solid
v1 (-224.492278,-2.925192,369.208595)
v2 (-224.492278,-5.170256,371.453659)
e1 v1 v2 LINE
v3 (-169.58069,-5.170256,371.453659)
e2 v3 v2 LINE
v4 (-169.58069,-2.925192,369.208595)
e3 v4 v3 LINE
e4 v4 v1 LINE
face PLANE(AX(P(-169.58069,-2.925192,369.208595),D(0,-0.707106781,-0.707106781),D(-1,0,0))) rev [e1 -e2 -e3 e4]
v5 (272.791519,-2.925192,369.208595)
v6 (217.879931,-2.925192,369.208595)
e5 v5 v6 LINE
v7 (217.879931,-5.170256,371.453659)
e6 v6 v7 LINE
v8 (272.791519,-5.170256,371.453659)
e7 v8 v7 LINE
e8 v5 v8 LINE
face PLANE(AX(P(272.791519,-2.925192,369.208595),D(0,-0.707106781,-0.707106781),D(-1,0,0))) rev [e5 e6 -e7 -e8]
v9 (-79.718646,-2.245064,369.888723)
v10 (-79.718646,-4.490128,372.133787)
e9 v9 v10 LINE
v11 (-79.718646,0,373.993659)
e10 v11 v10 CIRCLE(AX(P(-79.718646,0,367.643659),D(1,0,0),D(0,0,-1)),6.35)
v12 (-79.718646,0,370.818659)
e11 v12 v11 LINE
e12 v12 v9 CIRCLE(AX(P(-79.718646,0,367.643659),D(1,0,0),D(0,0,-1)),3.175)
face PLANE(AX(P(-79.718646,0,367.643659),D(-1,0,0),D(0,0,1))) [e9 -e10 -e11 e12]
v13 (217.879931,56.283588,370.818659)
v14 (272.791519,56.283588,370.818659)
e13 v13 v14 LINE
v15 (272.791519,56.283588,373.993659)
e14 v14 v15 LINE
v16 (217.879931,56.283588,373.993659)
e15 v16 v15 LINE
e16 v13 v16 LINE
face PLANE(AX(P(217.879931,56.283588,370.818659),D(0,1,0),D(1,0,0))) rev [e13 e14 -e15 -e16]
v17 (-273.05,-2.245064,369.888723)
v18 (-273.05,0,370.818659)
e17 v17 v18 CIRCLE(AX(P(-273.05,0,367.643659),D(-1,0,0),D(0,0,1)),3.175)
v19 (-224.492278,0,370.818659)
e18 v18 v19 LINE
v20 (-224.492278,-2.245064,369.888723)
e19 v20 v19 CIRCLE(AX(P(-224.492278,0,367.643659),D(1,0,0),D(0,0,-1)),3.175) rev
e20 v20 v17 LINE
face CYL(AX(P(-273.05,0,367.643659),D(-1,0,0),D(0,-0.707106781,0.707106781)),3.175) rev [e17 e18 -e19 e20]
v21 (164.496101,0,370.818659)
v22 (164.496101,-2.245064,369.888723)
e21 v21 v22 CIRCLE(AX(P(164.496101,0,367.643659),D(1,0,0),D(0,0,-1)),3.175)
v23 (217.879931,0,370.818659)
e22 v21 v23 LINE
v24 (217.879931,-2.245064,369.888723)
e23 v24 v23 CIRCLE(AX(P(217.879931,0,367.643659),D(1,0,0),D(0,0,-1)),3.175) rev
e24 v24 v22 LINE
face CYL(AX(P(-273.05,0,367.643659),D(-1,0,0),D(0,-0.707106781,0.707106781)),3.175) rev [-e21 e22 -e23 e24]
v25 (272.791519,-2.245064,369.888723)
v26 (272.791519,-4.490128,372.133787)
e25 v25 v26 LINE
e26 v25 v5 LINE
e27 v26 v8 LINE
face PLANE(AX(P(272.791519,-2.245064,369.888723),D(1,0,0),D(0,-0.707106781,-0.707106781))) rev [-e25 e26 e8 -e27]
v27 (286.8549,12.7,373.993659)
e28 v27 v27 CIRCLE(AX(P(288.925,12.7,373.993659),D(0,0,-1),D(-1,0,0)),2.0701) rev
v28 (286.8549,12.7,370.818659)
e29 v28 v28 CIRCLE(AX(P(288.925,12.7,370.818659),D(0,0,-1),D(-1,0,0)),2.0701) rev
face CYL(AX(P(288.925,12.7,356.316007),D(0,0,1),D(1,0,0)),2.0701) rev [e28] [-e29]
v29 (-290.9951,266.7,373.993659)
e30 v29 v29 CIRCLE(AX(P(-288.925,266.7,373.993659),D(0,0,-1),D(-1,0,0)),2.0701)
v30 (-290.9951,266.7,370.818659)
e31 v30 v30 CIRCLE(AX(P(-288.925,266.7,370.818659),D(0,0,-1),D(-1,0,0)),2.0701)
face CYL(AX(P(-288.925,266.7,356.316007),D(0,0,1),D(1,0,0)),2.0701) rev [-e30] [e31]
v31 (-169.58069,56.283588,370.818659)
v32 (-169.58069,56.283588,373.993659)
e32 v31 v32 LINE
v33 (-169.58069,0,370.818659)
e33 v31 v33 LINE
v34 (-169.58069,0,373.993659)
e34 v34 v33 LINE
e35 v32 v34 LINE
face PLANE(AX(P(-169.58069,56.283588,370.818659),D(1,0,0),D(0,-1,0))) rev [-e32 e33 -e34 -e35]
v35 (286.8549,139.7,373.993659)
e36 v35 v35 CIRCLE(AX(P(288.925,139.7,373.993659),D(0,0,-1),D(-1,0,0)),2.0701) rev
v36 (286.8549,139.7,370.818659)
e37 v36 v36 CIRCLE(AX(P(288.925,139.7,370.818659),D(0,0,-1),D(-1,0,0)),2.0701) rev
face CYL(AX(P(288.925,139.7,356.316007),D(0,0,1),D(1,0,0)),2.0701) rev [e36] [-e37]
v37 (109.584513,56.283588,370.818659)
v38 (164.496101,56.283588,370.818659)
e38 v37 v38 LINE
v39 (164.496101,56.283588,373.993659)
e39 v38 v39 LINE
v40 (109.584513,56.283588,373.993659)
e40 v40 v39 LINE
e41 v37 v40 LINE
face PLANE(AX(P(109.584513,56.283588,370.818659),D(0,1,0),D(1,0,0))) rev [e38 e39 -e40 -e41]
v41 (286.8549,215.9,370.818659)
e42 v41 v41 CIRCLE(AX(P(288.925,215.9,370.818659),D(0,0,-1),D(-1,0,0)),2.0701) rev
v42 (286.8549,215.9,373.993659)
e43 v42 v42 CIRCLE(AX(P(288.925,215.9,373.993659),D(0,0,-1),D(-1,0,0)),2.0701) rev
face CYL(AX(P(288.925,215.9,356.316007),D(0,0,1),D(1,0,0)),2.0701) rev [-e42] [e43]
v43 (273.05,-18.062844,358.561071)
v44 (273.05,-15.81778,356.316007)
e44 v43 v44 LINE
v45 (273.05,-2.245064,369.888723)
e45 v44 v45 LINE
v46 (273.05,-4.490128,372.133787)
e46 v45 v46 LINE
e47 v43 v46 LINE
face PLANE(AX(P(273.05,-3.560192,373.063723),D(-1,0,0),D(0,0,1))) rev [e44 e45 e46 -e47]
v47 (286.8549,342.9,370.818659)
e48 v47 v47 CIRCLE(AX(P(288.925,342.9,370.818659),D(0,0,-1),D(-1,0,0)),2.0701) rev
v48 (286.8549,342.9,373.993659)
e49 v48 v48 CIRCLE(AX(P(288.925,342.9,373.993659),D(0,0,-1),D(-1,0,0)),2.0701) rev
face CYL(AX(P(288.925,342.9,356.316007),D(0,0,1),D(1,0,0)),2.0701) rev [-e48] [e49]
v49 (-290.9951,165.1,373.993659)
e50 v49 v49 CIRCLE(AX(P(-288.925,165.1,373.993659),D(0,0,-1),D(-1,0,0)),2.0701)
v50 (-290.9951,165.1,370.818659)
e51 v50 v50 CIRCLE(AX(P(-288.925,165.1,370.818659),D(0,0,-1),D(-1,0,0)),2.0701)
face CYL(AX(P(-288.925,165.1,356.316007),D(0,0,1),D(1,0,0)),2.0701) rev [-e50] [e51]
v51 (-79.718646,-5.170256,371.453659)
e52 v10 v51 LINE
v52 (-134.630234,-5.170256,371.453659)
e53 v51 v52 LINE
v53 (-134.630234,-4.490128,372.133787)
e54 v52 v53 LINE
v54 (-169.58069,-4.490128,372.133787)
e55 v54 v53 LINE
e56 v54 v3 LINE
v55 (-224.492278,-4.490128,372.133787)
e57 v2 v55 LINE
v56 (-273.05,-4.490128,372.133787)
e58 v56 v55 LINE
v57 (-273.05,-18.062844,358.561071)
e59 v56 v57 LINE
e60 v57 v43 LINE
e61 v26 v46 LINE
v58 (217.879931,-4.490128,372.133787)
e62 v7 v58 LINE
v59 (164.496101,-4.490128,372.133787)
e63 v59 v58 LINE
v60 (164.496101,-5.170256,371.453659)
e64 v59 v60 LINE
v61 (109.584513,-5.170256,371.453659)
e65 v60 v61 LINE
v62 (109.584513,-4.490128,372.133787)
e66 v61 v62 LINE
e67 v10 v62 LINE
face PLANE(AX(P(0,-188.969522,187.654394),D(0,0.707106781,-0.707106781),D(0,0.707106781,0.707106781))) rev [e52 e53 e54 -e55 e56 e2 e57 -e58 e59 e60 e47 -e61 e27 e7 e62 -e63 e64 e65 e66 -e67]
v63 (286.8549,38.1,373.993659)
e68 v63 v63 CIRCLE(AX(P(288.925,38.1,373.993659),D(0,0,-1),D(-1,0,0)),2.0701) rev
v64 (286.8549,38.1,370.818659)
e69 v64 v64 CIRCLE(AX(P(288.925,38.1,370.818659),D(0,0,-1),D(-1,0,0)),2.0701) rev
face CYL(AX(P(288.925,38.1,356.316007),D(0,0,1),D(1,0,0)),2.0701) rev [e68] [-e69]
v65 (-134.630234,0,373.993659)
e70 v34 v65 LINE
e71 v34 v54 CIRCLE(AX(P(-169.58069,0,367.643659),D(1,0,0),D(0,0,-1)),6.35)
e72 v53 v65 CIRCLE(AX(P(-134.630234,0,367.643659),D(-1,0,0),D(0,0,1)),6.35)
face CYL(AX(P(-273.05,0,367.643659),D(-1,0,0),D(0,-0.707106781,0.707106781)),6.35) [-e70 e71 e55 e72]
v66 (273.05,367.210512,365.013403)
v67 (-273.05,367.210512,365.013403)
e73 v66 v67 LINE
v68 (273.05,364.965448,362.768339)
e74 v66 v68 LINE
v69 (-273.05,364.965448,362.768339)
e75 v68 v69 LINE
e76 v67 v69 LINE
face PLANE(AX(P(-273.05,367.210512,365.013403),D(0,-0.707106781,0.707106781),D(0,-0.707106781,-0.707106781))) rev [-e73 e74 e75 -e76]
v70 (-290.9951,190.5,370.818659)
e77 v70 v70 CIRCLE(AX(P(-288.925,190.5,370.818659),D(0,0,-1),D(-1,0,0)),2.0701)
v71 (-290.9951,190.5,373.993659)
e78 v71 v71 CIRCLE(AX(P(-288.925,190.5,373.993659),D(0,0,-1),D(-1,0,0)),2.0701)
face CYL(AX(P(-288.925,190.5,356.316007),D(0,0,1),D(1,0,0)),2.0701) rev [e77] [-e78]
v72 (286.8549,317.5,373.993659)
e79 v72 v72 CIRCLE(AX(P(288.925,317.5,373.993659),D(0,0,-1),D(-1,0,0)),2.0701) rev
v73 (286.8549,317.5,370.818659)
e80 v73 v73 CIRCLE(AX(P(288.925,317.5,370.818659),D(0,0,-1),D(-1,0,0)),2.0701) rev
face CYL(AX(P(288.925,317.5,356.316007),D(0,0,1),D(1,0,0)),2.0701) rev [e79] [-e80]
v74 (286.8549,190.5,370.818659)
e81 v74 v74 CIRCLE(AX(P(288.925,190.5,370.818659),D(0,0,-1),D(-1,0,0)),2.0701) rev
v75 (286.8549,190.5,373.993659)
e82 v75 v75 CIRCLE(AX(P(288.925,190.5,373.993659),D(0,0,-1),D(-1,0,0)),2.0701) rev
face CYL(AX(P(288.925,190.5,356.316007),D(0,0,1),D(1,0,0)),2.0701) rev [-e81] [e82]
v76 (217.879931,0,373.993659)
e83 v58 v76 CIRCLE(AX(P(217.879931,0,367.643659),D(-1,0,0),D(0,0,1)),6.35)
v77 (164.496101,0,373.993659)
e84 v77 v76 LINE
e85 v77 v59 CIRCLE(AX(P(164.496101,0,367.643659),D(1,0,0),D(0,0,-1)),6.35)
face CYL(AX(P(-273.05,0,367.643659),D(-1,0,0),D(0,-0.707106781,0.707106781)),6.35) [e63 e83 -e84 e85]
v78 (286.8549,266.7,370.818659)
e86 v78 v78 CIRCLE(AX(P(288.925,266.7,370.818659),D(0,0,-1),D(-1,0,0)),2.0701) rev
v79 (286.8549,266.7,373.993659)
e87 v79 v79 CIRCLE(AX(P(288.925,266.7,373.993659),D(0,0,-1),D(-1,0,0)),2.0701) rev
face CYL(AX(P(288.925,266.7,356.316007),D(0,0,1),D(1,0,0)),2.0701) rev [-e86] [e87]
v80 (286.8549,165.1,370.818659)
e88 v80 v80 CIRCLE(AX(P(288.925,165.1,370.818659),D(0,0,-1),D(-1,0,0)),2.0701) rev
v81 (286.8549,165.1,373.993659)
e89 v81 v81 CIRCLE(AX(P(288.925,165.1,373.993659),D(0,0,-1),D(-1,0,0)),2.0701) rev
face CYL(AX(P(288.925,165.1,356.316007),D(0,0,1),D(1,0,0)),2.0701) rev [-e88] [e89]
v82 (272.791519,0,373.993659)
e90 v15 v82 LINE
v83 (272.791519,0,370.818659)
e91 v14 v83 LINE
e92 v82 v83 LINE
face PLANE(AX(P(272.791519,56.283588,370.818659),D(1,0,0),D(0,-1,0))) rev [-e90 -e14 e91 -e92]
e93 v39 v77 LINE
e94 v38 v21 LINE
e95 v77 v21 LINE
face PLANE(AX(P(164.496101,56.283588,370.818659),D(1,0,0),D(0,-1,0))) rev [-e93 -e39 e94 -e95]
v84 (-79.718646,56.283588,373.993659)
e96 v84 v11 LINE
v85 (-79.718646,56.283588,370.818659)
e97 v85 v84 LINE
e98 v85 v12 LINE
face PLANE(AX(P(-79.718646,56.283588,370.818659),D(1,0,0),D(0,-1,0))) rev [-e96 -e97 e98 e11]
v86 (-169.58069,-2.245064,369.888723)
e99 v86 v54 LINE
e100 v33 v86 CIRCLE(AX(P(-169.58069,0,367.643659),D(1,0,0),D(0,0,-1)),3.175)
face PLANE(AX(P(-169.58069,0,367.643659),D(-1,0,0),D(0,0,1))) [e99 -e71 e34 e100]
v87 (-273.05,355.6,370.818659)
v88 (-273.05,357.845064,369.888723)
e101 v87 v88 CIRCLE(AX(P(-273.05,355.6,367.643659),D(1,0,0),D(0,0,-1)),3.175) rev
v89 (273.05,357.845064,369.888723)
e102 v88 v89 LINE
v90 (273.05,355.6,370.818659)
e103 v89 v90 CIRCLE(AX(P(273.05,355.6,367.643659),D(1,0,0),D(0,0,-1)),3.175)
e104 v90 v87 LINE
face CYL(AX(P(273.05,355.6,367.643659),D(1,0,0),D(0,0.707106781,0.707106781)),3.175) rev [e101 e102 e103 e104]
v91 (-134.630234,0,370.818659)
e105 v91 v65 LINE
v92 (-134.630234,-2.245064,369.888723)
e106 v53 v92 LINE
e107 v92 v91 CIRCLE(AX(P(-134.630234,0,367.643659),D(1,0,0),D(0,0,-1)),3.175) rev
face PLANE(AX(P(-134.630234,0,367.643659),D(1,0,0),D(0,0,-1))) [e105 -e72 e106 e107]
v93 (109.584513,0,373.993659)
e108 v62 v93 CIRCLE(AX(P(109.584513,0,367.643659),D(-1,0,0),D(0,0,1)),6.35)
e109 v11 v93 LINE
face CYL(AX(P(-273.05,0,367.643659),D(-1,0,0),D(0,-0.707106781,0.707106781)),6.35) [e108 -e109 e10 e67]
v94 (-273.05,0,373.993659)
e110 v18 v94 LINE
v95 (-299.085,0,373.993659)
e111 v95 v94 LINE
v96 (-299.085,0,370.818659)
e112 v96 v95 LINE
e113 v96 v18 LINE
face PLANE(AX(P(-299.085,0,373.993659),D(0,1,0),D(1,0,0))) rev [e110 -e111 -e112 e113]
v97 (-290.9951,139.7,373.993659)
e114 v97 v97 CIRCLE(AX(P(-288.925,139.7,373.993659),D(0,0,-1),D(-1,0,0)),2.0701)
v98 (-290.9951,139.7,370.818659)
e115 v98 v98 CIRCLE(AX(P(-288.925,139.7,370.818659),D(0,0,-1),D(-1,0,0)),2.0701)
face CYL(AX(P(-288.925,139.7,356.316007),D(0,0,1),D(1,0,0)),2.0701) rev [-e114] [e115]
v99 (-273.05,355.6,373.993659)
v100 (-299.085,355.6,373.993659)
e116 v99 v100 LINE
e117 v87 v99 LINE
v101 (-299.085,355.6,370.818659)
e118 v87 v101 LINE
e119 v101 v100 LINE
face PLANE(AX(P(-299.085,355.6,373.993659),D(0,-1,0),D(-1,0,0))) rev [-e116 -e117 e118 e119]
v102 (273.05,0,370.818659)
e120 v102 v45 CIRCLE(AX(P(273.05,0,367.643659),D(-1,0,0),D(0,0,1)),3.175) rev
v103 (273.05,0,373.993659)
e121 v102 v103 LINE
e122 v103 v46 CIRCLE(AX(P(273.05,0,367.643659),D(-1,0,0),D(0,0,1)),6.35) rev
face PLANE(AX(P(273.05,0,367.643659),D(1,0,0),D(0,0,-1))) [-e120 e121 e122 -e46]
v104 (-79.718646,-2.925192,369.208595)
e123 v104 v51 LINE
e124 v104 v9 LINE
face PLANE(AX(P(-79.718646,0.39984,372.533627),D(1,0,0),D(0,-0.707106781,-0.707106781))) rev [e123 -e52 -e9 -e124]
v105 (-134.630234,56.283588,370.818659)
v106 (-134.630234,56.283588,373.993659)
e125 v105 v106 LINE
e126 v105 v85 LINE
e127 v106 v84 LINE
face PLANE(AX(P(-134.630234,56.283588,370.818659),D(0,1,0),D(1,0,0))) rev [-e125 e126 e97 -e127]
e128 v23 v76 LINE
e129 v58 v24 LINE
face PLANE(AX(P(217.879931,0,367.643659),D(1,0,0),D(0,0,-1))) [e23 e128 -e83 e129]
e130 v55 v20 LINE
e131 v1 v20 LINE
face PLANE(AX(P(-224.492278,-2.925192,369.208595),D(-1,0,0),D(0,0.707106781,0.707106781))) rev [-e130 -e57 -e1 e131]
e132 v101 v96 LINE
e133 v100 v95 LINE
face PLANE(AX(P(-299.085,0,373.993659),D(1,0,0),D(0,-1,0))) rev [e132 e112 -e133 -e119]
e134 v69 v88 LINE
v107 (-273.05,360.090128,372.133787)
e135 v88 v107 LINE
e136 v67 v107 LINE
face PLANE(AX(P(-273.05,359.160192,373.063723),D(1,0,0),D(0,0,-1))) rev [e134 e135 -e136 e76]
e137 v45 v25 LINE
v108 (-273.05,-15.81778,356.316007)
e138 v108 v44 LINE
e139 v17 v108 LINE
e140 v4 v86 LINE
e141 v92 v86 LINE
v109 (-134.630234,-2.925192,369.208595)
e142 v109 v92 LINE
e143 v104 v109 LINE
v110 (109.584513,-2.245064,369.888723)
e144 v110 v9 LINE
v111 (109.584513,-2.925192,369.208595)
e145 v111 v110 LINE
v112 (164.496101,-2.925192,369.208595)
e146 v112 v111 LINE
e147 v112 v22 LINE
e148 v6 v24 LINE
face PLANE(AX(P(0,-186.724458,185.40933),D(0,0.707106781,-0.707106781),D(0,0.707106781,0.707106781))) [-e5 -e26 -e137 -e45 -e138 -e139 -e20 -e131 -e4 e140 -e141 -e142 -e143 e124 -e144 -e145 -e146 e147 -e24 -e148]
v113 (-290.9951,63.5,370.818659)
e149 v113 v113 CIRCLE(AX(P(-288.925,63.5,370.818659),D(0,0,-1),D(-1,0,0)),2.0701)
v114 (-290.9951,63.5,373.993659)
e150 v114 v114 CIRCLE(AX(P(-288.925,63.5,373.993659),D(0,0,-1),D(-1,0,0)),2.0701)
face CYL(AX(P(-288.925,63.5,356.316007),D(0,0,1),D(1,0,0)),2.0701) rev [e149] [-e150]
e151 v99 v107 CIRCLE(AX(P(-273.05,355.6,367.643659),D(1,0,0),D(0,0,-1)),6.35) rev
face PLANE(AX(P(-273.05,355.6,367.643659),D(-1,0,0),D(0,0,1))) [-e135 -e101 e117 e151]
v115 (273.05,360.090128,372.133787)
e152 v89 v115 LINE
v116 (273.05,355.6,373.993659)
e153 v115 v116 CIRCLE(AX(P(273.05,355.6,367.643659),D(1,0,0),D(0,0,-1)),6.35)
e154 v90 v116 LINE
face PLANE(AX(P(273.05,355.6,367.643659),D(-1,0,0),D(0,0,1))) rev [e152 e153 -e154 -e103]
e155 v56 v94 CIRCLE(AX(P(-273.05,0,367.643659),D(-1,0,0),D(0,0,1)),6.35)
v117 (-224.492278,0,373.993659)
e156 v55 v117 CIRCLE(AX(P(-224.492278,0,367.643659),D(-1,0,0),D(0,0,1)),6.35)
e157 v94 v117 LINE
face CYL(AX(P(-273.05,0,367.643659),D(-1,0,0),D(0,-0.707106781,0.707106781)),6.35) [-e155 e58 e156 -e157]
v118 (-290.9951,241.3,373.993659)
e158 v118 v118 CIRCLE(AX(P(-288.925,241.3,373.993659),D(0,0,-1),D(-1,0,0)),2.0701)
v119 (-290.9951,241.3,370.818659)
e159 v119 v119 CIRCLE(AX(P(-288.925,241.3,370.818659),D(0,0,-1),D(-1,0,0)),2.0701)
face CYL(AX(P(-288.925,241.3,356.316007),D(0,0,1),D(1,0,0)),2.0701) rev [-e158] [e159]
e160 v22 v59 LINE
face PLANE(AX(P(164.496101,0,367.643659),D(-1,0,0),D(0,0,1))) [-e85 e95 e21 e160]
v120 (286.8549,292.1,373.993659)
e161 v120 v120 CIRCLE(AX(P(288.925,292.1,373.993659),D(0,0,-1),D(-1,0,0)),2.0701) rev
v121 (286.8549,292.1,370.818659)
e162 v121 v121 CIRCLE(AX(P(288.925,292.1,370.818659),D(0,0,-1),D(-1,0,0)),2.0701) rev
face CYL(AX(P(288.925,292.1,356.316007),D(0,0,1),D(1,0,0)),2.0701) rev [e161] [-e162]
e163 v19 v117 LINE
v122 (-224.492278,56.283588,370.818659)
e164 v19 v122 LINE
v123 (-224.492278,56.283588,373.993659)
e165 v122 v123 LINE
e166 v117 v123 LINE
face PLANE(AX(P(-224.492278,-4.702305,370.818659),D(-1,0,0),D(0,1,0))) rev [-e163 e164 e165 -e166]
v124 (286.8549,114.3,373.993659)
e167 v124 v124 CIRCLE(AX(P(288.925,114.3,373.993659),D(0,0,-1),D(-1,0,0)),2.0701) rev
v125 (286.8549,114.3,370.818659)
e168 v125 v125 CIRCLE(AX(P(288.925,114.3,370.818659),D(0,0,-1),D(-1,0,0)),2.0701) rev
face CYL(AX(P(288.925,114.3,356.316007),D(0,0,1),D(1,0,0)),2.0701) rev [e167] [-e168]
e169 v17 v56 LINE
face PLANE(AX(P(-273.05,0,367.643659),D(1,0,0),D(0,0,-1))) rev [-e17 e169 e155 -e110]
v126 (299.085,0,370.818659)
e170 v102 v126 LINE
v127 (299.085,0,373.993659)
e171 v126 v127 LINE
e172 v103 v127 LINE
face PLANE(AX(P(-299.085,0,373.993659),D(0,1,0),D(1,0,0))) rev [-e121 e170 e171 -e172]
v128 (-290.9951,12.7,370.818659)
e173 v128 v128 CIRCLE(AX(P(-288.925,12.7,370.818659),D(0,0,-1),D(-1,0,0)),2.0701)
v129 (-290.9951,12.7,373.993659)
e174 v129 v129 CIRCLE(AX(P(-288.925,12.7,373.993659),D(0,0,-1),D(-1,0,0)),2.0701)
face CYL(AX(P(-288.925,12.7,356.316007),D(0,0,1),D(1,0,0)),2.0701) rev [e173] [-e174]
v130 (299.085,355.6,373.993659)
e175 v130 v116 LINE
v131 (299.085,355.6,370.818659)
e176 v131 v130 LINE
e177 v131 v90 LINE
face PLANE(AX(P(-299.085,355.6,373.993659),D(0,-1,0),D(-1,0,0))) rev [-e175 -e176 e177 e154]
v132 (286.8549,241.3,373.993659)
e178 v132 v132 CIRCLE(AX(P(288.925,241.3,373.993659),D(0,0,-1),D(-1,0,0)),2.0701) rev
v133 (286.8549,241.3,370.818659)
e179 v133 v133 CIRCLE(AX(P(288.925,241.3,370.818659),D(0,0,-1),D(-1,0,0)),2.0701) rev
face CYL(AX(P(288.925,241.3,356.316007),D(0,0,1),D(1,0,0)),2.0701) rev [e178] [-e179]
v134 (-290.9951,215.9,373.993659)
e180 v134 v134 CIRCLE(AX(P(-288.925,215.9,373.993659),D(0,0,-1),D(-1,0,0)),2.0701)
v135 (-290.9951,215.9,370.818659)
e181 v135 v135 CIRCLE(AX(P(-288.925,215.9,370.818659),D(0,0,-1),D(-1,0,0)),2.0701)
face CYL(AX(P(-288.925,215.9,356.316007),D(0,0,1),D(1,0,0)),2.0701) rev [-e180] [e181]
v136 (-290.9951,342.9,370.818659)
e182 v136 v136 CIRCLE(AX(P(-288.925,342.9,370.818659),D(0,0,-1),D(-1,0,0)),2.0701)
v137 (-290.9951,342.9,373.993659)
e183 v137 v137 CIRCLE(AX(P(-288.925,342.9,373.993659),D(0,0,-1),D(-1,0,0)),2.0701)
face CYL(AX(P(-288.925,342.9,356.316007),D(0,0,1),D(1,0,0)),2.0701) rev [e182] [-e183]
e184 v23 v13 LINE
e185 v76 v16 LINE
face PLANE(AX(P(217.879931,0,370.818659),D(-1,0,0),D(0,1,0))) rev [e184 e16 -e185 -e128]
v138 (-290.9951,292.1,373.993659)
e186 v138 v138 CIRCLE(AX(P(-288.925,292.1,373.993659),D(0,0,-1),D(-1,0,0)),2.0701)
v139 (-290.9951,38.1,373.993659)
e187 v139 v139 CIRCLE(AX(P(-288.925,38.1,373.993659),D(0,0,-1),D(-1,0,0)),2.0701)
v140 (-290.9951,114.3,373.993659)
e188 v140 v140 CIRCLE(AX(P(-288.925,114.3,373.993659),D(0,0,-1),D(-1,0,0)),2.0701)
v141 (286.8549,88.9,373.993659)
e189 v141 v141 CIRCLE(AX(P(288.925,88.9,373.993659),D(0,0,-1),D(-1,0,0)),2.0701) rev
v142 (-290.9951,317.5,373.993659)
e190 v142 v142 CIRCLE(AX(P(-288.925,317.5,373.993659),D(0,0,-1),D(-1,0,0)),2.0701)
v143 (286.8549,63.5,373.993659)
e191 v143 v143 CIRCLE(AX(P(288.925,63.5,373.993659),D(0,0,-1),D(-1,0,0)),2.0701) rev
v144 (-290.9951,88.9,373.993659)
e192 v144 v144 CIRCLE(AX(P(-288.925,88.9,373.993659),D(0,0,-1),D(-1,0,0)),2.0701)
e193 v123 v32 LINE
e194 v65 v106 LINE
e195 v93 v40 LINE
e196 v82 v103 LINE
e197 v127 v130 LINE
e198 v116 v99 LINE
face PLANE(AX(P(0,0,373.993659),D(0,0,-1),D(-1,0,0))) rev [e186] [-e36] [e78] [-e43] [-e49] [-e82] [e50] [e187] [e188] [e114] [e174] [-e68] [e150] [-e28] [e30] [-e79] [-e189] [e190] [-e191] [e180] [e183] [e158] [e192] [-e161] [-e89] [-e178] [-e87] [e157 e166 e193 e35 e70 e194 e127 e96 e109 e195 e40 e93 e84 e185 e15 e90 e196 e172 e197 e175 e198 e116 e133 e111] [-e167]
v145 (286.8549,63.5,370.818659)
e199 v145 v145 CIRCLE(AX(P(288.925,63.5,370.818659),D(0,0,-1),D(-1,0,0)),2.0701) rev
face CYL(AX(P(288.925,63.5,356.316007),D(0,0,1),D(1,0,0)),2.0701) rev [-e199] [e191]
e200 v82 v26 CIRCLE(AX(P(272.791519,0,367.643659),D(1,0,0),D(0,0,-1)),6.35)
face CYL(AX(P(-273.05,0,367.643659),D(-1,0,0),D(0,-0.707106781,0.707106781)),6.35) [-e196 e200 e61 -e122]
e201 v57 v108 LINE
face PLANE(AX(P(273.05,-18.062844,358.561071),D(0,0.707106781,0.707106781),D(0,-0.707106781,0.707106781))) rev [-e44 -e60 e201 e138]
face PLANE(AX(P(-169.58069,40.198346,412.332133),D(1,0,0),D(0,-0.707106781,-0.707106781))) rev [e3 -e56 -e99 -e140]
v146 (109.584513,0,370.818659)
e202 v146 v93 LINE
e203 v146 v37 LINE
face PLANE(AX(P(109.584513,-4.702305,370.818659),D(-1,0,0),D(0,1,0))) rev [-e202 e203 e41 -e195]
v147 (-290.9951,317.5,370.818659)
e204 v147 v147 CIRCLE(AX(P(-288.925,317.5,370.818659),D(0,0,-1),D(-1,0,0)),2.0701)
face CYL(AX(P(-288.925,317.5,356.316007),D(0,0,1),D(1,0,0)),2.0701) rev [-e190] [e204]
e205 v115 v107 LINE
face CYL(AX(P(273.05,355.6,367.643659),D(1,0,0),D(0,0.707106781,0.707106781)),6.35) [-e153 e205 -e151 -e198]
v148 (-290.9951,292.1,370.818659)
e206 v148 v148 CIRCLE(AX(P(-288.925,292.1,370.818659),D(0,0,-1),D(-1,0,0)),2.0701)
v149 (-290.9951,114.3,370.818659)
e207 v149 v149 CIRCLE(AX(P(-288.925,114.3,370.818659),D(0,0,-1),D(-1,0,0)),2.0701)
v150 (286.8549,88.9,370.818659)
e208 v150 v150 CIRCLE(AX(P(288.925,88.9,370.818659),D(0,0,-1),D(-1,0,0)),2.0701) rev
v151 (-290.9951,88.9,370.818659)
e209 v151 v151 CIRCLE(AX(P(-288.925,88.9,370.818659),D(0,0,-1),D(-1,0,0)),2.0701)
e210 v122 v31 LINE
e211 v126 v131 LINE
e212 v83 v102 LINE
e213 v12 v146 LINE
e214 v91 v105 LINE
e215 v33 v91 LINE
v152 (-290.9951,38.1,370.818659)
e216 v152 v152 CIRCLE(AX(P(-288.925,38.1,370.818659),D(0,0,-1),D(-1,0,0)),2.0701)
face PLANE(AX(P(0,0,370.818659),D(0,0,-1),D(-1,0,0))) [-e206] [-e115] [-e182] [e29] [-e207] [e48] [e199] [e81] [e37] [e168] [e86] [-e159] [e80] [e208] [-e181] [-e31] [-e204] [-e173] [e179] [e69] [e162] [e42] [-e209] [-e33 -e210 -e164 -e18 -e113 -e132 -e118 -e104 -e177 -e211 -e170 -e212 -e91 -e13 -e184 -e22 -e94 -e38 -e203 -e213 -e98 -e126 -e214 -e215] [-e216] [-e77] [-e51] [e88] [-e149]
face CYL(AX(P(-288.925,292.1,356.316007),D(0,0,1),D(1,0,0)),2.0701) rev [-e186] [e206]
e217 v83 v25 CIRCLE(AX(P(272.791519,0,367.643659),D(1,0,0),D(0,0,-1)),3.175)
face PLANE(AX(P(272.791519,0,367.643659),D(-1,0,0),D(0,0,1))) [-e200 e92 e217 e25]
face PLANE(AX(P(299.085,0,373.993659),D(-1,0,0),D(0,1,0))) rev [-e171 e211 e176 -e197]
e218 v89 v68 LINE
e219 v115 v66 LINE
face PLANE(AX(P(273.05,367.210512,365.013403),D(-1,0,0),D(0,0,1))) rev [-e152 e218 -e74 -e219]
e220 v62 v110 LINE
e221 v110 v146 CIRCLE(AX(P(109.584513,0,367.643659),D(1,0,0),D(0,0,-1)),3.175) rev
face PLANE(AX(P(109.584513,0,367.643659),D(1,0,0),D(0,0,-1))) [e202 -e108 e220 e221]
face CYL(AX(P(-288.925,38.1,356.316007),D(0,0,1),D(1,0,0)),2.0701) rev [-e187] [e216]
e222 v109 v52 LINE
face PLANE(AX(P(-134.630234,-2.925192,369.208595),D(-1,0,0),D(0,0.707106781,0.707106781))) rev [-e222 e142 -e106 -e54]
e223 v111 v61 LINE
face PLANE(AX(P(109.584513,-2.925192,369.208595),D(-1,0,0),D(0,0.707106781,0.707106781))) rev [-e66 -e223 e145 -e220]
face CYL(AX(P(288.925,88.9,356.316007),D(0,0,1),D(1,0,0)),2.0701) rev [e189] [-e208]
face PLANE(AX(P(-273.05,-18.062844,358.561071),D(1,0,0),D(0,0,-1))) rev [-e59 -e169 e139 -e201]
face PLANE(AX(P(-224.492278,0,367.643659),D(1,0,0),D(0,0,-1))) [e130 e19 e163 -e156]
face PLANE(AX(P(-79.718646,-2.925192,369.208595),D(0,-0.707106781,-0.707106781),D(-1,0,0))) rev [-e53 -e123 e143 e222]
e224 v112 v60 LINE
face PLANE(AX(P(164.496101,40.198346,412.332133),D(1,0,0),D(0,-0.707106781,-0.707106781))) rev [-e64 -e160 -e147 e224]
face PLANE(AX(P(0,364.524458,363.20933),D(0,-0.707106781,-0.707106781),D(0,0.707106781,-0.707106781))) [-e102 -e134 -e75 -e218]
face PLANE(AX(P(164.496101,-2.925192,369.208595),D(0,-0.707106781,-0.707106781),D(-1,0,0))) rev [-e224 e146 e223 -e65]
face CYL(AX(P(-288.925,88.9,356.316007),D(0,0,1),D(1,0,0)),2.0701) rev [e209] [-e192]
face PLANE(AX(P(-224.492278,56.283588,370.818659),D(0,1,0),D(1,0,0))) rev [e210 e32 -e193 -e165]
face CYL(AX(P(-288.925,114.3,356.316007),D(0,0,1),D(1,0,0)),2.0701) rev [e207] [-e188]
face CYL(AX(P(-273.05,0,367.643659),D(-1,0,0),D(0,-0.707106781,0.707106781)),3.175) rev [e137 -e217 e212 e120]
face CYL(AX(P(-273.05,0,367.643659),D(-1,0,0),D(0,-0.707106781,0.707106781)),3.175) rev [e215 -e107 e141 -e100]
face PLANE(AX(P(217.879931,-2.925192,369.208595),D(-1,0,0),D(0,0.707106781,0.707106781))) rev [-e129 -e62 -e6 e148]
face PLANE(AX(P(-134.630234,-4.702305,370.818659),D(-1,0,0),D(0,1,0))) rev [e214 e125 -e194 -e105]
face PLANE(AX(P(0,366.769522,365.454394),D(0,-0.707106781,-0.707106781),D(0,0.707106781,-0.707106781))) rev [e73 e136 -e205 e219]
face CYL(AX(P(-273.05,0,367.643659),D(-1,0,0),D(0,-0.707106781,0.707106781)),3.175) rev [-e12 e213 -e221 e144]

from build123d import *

# Parameters (mm, degrees)
SKETCH1_W                = 598.17
SKETCH1_H                = 355.6
BOSS_EXTRUDE1_DEPTH      = 3.175
EDGE_FLANGE1_DEPTH       = 546.1
EDGE_FLANGE2_DEPTH       = 546.1
SKETCH13_R               = 2.0701
CUT_EXTRUDE1_DEPTH       = 474.928155862
LPATTERN1_COUNT          = 14
LPATTERN1_PITCH          = 25.4
MIRROR1_COPY_1_SKETCH_R  = 2.0701
MIRROR1_COPY_1_DEPTH     = 474.928155862
MIRROR1_COPY_2_SKETCH_R  = 2.0701
MIRROR1_COPY_2_DEPTH     = 474.928155862
MIRROR1_COPY_3_SKETCH_R  = 2.0701
MIRROR1_COPY_3_DEPTH     = 474.928155862
MIRROR1_COPY_4_SKETCH_R  = 2.0701
MIRROR1_COPY_4_DEPTH     = 474.928155862
MIRROR1_COPY_5_SKETCH_R  = 2.0701
MIRROR1_COPY_5_DEPTH     = 474.928155862
MIRROR1_COPY_6_SKETCH_R  = 2.0701
MIRROR1_COPY_6_DEPTH     = 474.928155862
MIRROR1_COPY_7_SKETCH_R  = 2.0701
MIRROR1_COPY_7_DEPTH     = 474.928155862
MIRROR1_COPY_8_SKETCH_R  = 2.0701
MIRROR1_COPY_8_DEPTH     = 474.928155862
MIRROR1_COPY_9_SKETCH_R  = 2.0701
MIRROR1_COPY_9_DEPTH     = 474.928155862
MIRROR1_COPY_10_SKETCH_R = 2.0701
MIRROR1_COPY_10_DEPTH    = 474.928155862
MIRROR1_COPY_11_SKETCH_R = 2.0701
MIRROR1_COPY_11_DEPTH    = 474.928155862
MIRROR1_COPY_12_SKETCH_R = 2.0701
MIRROR1_COPY_12_DEPTH    = 474.928155862
MIRROR1_COPY_13_SKETCH_R = 2.0701
MIRROR1_COPY_13_DEPTH    = 474.928155862
CUT_EXTRUDE2_START       = -224.492278251
CUT_EXTRUDE2_DEPTH       = 54.911587961
CUT_EXTRUDE2_START_2     = -134.630234215
CUT_EXTRUDE2_2_DEPTH     = 54.911587961
CUT_EXTRUDE2_START_3     = 109.584512833
CUT_EXTRUDE2_3_DEPTH     = 54.911587961
CUT_EXTRUDE2_START_4     = 217.879930564
CUT_EXTRUDE2_4_DEPTH     = 54.911587961


# Read off the part's stored shape, not the designer's step: Cut-Extrude2
# Sheet-metal steps are written as plain solids
with BuildPart() as part:
    # Sketch1 → Boss-Extrude1 (new body)
    with BuildSketch(Plane.XY.offset(370.818659046)):
        with Locations((0, 177.8)):
            Rectangle(SKETCH1_W, SKETCH1_H)
    extrude(amount=BOSS_EXTRUDE1_DEPTH)

    # Edge-Flange1 section (across the edge) → Edge-Flange1 (add)
    with BuildSketch(Plane(origin=(273.05, -1.315128061, 370.818659046), x_dir=(0, 0.7071067811865438, -0.7071067811865512), z_dir=(-1, 0, 0))):
        with BuildLine():
            Line((-3.175, 1.315128061), (-3.175, 20.509847662))
            Line((-3.175, 20.509847662), (0, 20.509847662))
            Line((0, 20.509847662), (0, 1.315128061))
            ThreePointArc((0, 1.315128061), (0.241682484, 0.100108163), (0.92993597, -0.92993597))
            Line((0.92993597, -0.92993597), (-1.315128061, -3.175))
            ThreePointArc((-1.315128061, -3.175), (-2.691635031, -1.114911735), (-3.175, 1.315128061))
        make_face()
    extrude(amount=EDGE_FLANGE1_DEPTH)

    # Edge-Flange2 section (across the edge) → Edge-Flange2 (add)
    with BuildSketch(Plane(origin=(-273.05, 356.915128061, 370.818659046), x_dir=(0, -0.7071067811865438, -0.7071067811865512), z_dir=(1, 0, 0))):
        with BuildLine():
            Line((-3.175, 1.315128061), (-3.175, 11.384871939))
            Line((-3.175, 11.384871939), (0, 11.384871939))
            Line((0, 11.384871939), (0, 1.315128061))
            ThreePointArc((0, 1.315128061), (0.241682484, 0.100108163), (0.92993597, -0.92993597))
            Line((0.92993597, -0.92993597), (-1.315128061, -3.175))
            ThreePointArc((-1.315128061, -3.175), (-2.691635031, -1.114911735), (-3.175, 1.315128061))
        make_face()
    extrude(amount=EDGE_FLANGE2_DEPTH)

    # Sketch13 → Cut-Extrude1 (cut, symmetric)
    with BuildSketch(Plane.XY.offset(373.993659046)):
        with Locations(Location((-288.925, 342.9, 0), (0, 0, 180))):
            Circle(SKETCH13_R)
    cut_extrude1 = extrude(amount=CUT_EXTRUDE1_DEPTH, both=True, mode=Mode.SUBTRACT)

    # LPattern1: Cut-Extrude1 ×14
    with Locations(*[(0, -i * LPATTERN1_PITCH, 0) for i in range(1, LPATTERN1_COUNT)]):
        add(cut_extrude1, mode=Mode.SUBTRACT)

    # Mirror1: Cut-Extrude1 across plane
    add(cut_extrude1.mirror(Plane.ZY), mode=Mode.SUBTRACT)

    # Mirror1 copy 1 sketch → Mirror1 copy 1 (cut, symmetric)
    with BuildSketch(Plane(origin=(0, -25.4, 373.993659046), x_dir=(-1, 0, 0), z_dir=(0, 0, 1))):
        with Locations((-288.925, -342.9)):
            Circle(MIRROR1_COPY_1_SKETCH_R)
    extrude(amount=MIRROR1_COPY_1_DEPTH, both=True, mode=Mode.SUBTRACT)

    # Mirror1 copy 2 sketch → Mirror1 copy 2 (cut, symmetric)
    with BuildSketch(Plane(origin=(0, -50.8, 373.993659046), x_dir=(-1, 0, 0), z_dir=(0, 0, 1))):
        with Locations((-288.925, -342.9)):
            Circle(MIRROR1_COPY_2_SKETCH_R)
    extrude(amount=MIRROR1_COPY_2_DEPTH, both=True, mode=Mode.SUBTRACT)

    # Mirror1 copy 3 sketch → Mirror1 copy 3 (cut, symmetric)
    with BuildSketch(Plane(origin=(0, -76.2, 373.993659046), x_dir=(-1, 0, 0), z_dir=(0, 0, 1))):
        with Locations((-288.925, -342.9)):
            Circle(MIRROR1_COPY_3_SKETCH_R)
    extrude(amount=MIRROR1_COPY_3_DEPTH, both=True, mode=Mode.SUBTRACT)

    # Mirror1 copy 4 sketch → Mirror1 copy 4 (cut, symmetric)
    with BuildSketch(Plane(origin=(0, -101.6, 373.993659046), x_dir=(-1, 0, 0), z_dir=(0, 0, 1))):
        with Locations((-288.925, -342.9)):
            Circle(MIRROR1_COPY_4_SKETCH_R)
    extrude(amount=MIRROR1_COPY_4_DEPTH, both=True, mode=Mode.SUBTRACT)

    # Mirror1 copy 5 sketch → Mirror1 copy 5 (cut, symmetric)
    with BuildSketch(Plane(origin=(0, -127, 373.993659046), x_dir=(-1, 0, 0), z_dir=(0, 0, 1))):
        with Locations((-288.925, -342.9)):
            Circle(MIRROR1_COPY_5_SKETCH_R)
    extrude(amount=MIRROR1_COPY_5_DEPTH, both=True, mode=Mode.SUBTRACT)

    # Mirror1 copy 6 sketch → Mirror1 copy 6 (cut, symmetric)
    with BuildSketch(Plane(origin=(0, -152.4, 373.993659046), x_dir=(-1, 0, 0), z_dir=(0, 0, 1))):
        with Locations((-288.925, -342.9)):
            Circle(MIRROR1_COPY_6_SKETCH_R)
    extrude(amount=MIRROR1_COPY_6_DEPTH, both=True, mode=Mode.SUBTRACT)

    # Mirror1 copy 7 sketch → Mirror1 copy 7 (cut, symmetric)
    with BuildSketch(Plane(origin=(0, -177.8, 373.993659046), x_dir=(-1, 0, 0), z_dir=(0, 0, 1))):
        with Locations((-288.925, -342.9)):
            Circle(MIRROR1_COPY_7_SKETCH_R)
    extrude(amount=MIRROR1_COPY_7_DEPTH, both=True, mode=Mode.SUBTRACT)

    # Mirror1 copy 8 sketch → Mirror1 copy 8 (cut, symmetric)
    with BuildSketch(Plane(origin=(0, -203.2, 373.993659046), x_dir=(-1, 0, 0), z_dir=(0, 0, 1))):
        with Locations((-288.925, -342.9)):
            Circle(MIRROR1_COPY_8_SKETCH_R)
    extrude(amount=MIRROR1_COPY_8_DEPTH, both=True, mode=Mode.SUBTRACT)

    # Mirror1 copy 9 sketch → Mirror1 copy 9 (cut, symmetric)
    with BuildSketch(Plane(origin=(0, -228.6, 373.993659046), x_dir=(-1, 0, 0), z_dir=(0, 0, 1))):
        with Locations((-288.925, -342.9)):
            Circle(MIRROR1_COPY_9_SKETCH_R)
    extrude(amount=MIRROR1_COPY_9_DEPTH, both=True, mode=Mode.SUBTRACT)

    # Mirror1 copy 10 sketch → Mirror1 copy 10 (cut, symmetric)
    with BuildSketch(Plane(origin=(0, -254, 373.993659046), x_dir=(-1, 0, 0), z_dir=(0, 0, 1))):
        with Locations((-288.925, -342.9)):
            Circle(MIRROR1_COPY_10_SKETCH_R)
    extrude(amount=MIRROR1_COPY_10_DEPTH, both=True, mode=Mode.SUBTRACT)

    # Mirror1 copy 11 sketch → Mirror1 copy 11 (cut, symmetric)
    with BuildSketch(Plane(origin=(0, -279.4, 373.993659046), x_dir=(-1, 0, 0), z_dir=(0, 0, 1))):
        with Locations((-288.925, -342.9)):
            Circle(MIRROR1_COPY_11_SKETCH_R)
    extrude(amount=MIRROR1_COPY_11_DEPTH, both=True, mode=Mode.SUBTRACT)

    # Mirror1 copy 12 sketch → Mirror1 copy 12 (cut, symmetric)
    with BuildSketch(Plane(origin=(0, -304.8, 373.993659046), x_dir=(-1, 0, 0), z_dir=(0, 0, 1))):
        with Locations((-288.925, -342.9)):
            Circle(MIRROR1_COPY_12_SKETCH_R)
    extrude(amount=MIRROR1_COPY_12_DEPTH, both=True, mode=Mode.SUBTRACT)

    # Mirror1 copy 13 sketch → Mirror1 copy 13 (cut, symmetric)
    with BuildSketch(Plane(origin=(0, -330.2, 373.993659046), x_dir=(-1, 0, 0), z_dir=(0, 0, 1))):
        with Locations((-288.925, -342.9)):
            Circle(MIRROR1_COPY_13_SKETCH_R)
    extrude(amount=MIRROR1_COPY_13_DEPTH, both=True, mode=Mode.SUBTRACT)

    # Cut-Extrude2 outline → Cut-Extrude2 (cut)
    with BuildSketch(Plane.YZ.offset(CUT_EXTRUDE2_START)):
        with BuildLine():
            Line((-4.490128061, 372.133787106), (-5.170256121, 371.453659046))
            Line((-5.170256121, 371.453659046), (-2.925192091, 369.208595015))
            Line((-2.925192091, 369.208595015), (-2.24506403, 369.888723076))
            ThreePointArc((-2.24506403, 369.888723076), (-1.215019898, 370.576976561), (0, 370.818659046))
            Line((0, 370.818659046), (56.283587678, 370.818659046))
            Line((56.283587678, 370.818659046), (56.283587678, 373.993659046))
            Line((56.283587678, 373.993659046), (0, 373.993659046))
            ThreePointArc((0, 373.993659046), (-2.430039796, 373.510294077), (-4.490128061, 372.133787106))
        make_face()
    extrude(amount=CUT_EXTRUDE2_DEPTH, mode=Mode.SUBTRACT)

    # Cut-Extrude2 2 outline → Cut-Extrude2 2 (cut)
    with BuildSketch(Plane.YZ.offset(CUT_EXTRUDE2_START_2)):
        with BuildLine():
            Line((-4.490128061, 372.133787106), (-5.170256121, 371.453659046))
            Line((-5.170256121, 371.453659046), (-2.925192091, 369.208595015))
            Line((-2.925192091, 369.208595015), (-2.24506403, 369.888723076))
            ThreePointArc((-2.24506403, 369.888723076), (-1.215019898, 370.576976561), (0, 370.818659046))
            Line((0, 370.818659046), (56.283587678, 370.818659046))
            Line((56.283587678, 370.818659046), (56.283587678, 373.993659046))
            Line((56.283587678, 373.993659046), (0, 373.993659046))
            ThreePointArc((0, 373.993659046), (-2.430039796, 373.510294077), (-4.490128061, 372.133787106))
        make_face()
    extrude(amount=CUT_EXTRUDE2_2_DEPTH, mode=Mode.SUBTRACT)

    # Cut-Extrude2 3 outline → Cut-Extrude2 3 (cut)
    with BuildSketch(Plane.YZ.offset(CUT_EXTRUDE2_START_3)):
        with BuildLine():
            Line((-4.490128061, 372.133787106), (-5.170256121, 371.453659046))
            Line((-5.170256121, 371.453659046), (-2.925192091, 369.208595015))
            Line((-2.925192091, 369.208595015), (-2.24506403, 369.888723076))
            ThreePointArc((-2.24506403, 369.888723076), (-1.215019898, 370.576976561), (0, 370.818659046))
            Line((0, 370.818659046), (56.283587678, 370.818659046))
            Line((56.283587678, 370.818659046), (56.283587678, 373.993659046))
            Line((56.283587678, 373.993659046), (0, 373.993659046))
            ThreePointArc((0, 373.993659046), (-2.430039796, 373.510294077), (-4.490128061, 372.133787106))
        make_face()
    extrude(amount=CUT_EXTRUDE2_3_DEPTH, mode=Mode.SUBTRACT)

    # Cut-Extrude2 4 outline → Cut-Extrude2 4 (cut)
    with BuildSketch(Plane.YZ.offset(CUT_EXTRUDE2_START_4)):
        with BuildLine():
            Line((-4.490128061, 372.133787106), (-5.170256121, 371.453659046))
            Line((-5.170256121, 371.453659046), (-2.925192091, 369.208595015))
            Line((-2.925192091, 369.208595015), (-2.24506403, 369.888723076))
            ThreePointArc((-2.24506403, 369.888723076), (-1.215019898, 370.576976561), (0, 370.818659046))
            Line((0, 370.818659046), (56.283587678, 370.818659046))
            Line((56.283587678, 370.818659046), (56.283587678, 373.993659046))
            Line((56.283587678, 373.993659046), (0, 373.993659046))
            ThreePointArc((0, 373.993659046), (-2.430039796, 373.510294077), (-4.490128061, 372.133787106))
        make_face()
    extrude(amount=CUT_EXTRUDE2_4_DEPTH, mode=Mode.SUBTRACT)


solid = part.part
